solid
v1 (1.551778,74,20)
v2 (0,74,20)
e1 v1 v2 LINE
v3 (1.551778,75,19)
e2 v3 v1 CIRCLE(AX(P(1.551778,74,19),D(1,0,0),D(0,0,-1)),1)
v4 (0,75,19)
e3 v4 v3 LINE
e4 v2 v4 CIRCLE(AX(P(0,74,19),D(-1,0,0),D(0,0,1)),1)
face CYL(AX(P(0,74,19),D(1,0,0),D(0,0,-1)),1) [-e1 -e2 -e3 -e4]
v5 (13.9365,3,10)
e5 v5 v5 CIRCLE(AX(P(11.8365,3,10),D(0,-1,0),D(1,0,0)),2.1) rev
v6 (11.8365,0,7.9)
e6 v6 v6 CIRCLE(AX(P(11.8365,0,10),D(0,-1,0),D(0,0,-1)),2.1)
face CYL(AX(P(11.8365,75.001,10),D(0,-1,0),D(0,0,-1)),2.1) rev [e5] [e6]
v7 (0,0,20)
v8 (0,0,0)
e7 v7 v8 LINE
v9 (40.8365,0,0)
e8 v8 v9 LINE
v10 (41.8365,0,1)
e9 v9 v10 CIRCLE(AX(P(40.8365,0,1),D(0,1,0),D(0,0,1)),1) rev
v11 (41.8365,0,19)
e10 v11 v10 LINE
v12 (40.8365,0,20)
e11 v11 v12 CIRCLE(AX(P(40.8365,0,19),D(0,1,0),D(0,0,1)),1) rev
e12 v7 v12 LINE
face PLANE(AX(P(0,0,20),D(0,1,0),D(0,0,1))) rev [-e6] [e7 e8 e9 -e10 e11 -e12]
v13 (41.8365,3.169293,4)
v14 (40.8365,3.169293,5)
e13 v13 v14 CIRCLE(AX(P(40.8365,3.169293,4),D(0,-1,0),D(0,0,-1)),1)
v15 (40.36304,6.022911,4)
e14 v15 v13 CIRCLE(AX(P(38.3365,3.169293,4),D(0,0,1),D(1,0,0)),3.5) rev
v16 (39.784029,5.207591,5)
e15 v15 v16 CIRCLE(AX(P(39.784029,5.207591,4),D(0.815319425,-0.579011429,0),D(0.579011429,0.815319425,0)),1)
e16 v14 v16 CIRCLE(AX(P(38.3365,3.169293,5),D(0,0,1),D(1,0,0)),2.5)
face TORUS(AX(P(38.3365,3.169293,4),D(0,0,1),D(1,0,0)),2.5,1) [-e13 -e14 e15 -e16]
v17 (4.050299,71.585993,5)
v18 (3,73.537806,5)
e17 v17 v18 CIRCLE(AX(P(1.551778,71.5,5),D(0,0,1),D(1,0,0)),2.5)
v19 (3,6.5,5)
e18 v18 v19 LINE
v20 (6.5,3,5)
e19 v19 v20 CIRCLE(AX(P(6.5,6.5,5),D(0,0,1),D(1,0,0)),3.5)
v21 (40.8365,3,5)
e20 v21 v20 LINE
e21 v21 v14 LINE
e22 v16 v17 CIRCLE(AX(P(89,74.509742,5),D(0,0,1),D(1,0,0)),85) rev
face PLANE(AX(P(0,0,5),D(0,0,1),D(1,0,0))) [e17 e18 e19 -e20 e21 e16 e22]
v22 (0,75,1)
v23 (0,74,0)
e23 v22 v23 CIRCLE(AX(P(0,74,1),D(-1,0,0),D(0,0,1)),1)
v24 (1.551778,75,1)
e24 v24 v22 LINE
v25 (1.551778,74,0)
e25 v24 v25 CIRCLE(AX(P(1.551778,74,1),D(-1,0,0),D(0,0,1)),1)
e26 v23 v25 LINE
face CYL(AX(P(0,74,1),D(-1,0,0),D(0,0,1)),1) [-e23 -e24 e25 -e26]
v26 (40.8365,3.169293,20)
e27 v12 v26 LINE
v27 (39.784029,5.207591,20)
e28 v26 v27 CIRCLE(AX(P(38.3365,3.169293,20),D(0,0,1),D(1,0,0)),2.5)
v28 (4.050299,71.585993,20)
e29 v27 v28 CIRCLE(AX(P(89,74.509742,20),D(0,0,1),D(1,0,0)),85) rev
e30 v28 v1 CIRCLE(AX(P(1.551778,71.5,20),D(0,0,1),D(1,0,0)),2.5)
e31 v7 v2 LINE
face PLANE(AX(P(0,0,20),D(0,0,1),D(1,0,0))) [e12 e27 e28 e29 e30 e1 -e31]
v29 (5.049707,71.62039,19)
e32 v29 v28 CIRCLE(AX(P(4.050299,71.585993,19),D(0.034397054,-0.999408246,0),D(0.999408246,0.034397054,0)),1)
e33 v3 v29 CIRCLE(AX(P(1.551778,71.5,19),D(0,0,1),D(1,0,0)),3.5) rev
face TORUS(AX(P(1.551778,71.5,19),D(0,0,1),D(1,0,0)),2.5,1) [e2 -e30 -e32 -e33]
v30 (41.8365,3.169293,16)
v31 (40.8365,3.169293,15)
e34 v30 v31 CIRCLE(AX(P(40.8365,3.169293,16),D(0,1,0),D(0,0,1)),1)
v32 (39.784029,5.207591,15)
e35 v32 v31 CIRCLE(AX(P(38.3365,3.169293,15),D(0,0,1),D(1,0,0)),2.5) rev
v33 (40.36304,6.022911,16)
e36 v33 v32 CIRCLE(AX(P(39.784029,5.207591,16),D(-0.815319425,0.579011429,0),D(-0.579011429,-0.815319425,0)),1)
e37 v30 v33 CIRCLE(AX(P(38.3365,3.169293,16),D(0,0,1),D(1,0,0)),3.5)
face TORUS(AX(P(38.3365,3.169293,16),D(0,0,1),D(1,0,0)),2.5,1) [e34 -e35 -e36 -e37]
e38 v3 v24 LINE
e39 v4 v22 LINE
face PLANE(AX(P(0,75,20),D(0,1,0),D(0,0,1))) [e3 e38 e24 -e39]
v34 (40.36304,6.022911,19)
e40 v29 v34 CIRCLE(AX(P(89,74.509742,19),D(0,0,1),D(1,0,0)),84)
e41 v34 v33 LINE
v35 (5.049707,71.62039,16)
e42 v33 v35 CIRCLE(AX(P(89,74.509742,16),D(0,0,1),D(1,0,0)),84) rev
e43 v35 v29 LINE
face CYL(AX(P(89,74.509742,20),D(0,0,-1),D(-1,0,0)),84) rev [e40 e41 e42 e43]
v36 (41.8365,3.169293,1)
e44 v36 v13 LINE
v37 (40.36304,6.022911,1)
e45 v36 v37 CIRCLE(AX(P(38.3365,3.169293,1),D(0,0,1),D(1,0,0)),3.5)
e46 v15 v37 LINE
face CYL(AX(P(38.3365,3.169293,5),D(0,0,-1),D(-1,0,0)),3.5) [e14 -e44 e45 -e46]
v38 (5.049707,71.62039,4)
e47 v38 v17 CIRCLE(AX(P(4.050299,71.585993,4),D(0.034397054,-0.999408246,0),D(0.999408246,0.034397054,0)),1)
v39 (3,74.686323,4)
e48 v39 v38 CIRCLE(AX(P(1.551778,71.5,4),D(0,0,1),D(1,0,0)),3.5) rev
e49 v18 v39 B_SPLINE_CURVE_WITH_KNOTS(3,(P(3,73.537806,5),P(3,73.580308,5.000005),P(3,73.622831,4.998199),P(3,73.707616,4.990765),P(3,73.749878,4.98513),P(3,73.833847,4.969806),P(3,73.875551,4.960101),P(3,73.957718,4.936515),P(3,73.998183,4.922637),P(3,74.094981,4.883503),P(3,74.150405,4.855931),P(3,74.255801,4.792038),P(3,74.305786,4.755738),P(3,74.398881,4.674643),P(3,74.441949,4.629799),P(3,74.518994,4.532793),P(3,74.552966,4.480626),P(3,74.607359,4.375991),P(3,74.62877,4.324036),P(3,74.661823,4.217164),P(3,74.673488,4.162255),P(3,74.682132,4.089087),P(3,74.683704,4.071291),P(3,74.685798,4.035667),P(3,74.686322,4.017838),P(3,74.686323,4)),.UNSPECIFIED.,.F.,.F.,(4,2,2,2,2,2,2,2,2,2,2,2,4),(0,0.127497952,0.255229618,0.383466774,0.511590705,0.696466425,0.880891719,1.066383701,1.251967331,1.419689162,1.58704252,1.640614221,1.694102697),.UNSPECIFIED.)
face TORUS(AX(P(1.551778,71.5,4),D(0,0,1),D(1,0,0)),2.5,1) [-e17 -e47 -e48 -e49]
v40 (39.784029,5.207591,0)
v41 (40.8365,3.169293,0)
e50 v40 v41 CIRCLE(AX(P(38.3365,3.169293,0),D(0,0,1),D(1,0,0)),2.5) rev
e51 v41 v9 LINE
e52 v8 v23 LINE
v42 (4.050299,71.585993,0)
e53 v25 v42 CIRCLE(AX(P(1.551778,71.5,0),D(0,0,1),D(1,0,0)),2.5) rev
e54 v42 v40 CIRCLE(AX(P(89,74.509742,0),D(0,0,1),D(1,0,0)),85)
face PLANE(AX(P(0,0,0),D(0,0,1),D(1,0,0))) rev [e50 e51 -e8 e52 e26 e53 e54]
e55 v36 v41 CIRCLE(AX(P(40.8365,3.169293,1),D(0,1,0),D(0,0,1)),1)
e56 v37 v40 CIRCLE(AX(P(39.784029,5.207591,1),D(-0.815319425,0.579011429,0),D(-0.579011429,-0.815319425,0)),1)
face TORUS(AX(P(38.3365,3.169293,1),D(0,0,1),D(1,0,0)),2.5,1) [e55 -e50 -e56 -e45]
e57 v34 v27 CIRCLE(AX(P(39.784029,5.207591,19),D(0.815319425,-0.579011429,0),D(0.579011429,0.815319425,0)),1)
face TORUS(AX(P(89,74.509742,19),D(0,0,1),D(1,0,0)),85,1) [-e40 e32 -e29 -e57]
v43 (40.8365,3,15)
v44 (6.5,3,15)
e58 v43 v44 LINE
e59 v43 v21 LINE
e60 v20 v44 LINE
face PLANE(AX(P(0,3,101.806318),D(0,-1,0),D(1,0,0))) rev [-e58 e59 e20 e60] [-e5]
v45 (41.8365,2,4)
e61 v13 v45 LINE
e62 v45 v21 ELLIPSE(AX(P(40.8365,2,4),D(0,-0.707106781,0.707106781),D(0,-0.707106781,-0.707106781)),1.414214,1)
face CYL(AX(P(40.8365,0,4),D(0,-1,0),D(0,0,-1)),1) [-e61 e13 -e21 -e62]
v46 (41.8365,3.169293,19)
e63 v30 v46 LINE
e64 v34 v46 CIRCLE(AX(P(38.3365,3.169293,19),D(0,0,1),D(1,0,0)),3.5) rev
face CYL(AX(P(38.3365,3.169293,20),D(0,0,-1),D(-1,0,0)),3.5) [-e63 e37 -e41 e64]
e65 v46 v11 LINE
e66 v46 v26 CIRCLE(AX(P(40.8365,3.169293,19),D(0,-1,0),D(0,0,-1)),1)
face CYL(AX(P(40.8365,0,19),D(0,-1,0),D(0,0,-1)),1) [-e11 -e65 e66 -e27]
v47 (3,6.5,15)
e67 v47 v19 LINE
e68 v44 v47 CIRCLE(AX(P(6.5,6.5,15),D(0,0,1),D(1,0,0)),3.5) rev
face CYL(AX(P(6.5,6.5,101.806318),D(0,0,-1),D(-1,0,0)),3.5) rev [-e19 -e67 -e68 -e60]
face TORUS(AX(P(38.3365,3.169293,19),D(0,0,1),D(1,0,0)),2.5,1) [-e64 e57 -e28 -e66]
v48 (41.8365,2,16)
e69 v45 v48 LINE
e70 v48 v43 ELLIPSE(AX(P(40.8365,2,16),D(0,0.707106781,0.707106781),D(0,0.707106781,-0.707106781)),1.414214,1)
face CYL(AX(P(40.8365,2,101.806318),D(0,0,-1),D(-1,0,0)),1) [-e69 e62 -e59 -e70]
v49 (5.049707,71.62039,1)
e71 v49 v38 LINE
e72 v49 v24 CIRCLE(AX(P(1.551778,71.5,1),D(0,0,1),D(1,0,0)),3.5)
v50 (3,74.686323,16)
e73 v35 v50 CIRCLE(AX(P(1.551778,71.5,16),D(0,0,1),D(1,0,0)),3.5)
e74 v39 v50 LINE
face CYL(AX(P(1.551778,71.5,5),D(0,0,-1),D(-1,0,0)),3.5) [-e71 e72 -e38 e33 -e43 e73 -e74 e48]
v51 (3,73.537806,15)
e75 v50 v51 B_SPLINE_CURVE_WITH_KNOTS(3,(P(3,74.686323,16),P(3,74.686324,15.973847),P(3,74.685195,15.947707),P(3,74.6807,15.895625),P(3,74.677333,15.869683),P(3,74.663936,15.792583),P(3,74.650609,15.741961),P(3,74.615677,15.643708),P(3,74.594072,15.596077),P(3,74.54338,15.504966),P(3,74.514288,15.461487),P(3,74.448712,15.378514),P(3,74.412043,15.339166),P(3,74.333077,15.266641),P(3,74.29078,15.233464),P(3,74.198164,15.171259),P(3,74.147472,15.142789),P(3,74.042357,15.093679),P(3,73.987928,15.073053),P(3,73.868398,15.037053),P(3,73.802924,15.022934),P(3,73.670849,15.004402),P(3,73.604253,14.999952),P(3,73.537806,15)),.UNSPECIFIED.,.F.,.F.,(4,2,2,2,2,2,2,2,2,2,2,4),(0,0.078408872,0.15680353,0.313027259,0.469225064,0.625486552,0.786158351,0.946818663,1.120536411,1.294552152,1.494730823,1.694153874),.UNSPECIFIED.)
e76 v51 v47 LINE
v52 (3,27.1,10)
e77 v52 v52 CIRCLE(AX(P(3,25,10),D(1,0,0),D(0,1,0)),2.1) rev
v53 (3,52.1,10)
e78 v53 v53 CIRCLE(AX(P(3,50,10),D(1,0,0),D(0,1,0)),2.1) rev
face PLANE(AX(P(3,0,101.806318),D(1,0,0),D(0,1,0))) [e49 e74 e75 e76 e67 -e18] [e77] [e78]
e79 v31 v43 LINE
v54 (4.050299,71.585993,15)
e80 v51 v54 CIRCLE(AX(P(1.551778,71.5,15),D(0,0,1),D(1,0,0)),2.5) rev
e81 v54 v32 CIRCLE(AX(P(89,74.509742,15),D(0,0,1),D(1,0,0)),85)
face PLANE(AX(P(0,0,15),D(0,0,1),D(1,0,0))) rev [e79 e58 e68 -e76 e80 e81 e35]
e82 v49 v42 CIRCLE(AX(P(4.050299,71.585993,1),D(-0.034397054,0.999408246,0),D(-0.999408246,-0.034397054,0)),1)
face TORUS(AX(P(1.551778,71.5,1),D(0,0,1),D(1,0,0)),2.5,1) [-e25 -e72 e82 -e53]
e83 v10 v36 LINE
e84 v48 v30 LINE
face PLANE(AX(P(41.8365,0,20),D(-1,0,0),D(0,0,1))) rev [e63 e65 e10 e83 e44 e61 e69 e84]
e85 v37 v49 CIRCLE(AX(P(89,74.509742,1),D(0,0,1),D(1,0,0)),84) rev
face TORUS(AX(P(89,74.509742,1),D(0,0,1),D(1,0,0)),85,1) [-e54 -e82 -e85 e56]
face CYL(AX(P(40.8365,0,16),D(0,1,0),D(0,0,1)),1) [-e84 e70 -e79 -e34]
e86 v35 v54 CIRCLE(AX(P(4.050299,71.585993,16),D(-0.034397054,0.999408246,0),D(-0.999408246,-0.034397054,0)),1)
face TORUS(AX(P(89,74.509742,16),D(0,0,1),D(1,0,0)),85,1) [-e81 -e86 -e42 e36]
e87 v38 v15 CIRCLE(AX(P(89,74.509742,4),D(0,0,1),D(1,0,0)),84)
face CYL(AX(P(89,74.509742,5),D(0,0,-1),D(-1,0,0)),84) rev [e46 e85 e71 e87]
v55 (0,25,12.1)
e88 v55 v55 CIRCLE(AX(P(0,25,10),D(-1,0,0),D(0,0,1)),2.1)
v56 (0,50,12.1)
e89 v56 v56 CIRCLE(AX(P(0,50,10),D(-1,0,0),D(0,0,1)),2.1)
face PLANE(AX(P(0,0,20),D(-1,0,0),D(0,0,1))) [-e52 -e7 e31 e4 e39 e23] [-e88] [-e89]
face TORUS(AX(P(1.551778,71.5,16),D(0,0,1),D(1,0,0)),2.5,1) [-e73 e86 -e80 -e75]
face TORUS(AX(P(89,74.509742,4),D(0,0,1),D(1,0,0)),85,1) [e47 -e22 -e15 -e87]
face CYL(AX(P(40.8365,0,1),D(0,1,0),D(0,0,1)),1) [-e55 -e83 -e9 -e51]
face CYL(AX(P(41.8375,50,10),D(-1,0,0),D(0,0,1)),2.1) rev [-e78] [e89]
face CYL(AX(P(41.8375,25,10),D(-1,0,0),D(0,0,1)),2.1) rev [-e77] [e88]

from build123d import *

# Parameters (mm, degrees)
BOSS_EXTRUDE1_DEPTH = 20
CUT_EXTRUDE1_DEPTH  = 15
BOSS_EXTRUDE2_DEPTH = 5
CUT_EXTRUDE2_REACH  = 90.178
SKETCH2_R           = 2.1
CUT_EXTRUDE3_REACH  = 90.178
SKETCH3_R           = 2.1
FILLET2_R           = 84
FILLET3_R           = 3.5
FILLET4_R           = 1


with BuildPart() as part:
    # Sketch1 → Boss-Extrude1 (new body)
    with BuildSketch(Plane.XY):
        Polygon((41.8365, 5), (5, 5), (5, 75), (0, 75), (0, 0), (41.8365, 0), align=None)
    extrude(amount=BOSS_EXTRUDE1_DEPTH)

    # Sketch1<3> → Cut-Extrude1 (cut)
    with BuildSketch(Plane.XY):
        Polygon((41.8365, 5), (5, 5), (5, 75), (3, 75), (3, 3), (41.8365, 3), align=None)
    extrude(amount=CUT_EXTRUDE1_DEPTH, mode=Mode.SUBTRACT)

    # Sketch1<4> → Boss-Extrude2 (add)
    with BuildSketch(Plane.XY):
        Polygon((41.8365, 5), (5, 5), (5, 75), (3, 75), (3, 3), (41.8365, 3), align=None)
    extrude(amount=BOSS_EXTRUDE2_DEPTH)

    # Sketch2 → Cut-Extrude2 (cut, up to next)
    with BuildSketch(Plane.XZ, mode=Mode.PRIVATE) as cut_extrude2_sk1:
        with Locations(Location((11.8365, 10, 0), (0, 0, 270))):
            Circle(SKETCH2_R)
    cut_extrude2_tool1 = extrude(cut_extrude2_sk1.sketch, amount=-CUT_EXTRUDE2_REACH, mode=Mode.PRIVATE) & part.part
    add(cut_extrude2_tool1.solids().sort_by_distance((11.8365, 0, 10))[0], mode=Mode.SUBTRACT)

    # Sketch3 → Cut-Extrude3 (cut, up to next)
    with BuildSketch(Plane.ZY, mode=Mode.PRIVATE) as cut_extrude3_sk1:
        with Locations((10, 25)):
            Circle(SKETCH3_R)
    cut_extrude3_tool1 = extrude(cut_extrude3_sk1.sketch, amount=-CUT_EXTRUDE3_REACH, mode=Mode.PRIVATE) & part.part
    # Sketch3 → Cut-Extrude3 (cut, up to next)
    with BuildSketch(Plane.ZY, mode=Mode.PRIVATE) as cut_extrude3_sk2:
        with Locations((10, 50)):
            Circle(SKETCH3_R)
    cut_extrude3_tool2 = extrude(cut_extrude3_sk2.sketch, amount=-CUT_EXTRUDE3_REACH, mode=Mode.PRIVATE) & part.part
    add(cut_extrude3_tool1.solids().sort_by_distance((0, 25, 10))[0], mode=Mode.SUBTRACT)
    add(cut_extrude3_tool2.solids().sort_by_distance((0, 50, 10))[0], mode=Mode.SUBTRACT)

    # Fillet2
    # the kernel refuses this fillet: 84 mm, written as the material it adds along each edge
    with BuildSketch(Plane(origin=(5, 5, -158.774355627), x_dir=(1, 0, 0), z_dir=(0, 0, 1))) as fillet2_piece_1_section:
        with BuildLine():
            CenterArc((84, 69.509742251), FILLET2_R, 180, 55.842464398)
            Line((0, 69.509742251), (-1.68, 69.509742251))
            Line((-1.68, 69.509742251), (-1.68, 0))
            Line((-1.68, 0), (0, -1.68))
            ThreePointArc((0, -1.68), (18.41825, -1.68), (35.89323, -1.390194845))
            Line((35.89323, -1.390194845), (36.8365, 0))
        make_face()
    fillet2_piece_1 = extrude(amount=178.774355627, mode=Mode.PRIVATE)
    fillet2_piece_1 = split(fillet2_piece_1, bisect_by=Plane(origin=(14.491057498, 22.671022952, 0), z_dir=(0, 0, 1)), keep=Keep.TOP, mode=Mode.PRIVATE)
    fillet2_piece_1 = split(fillet2_piece_1, bisect_by=Plane(origin=(14.491057498, 22.671022952, 5), z_dir=(0, 0, -1)), keep=Keep.TOP, mode=Mode.PRIVATE)
    add(fillet2_piece_1)
    with BuildSketch(Plane(origin=(5, 5, 15), x_dir=(1, 0, 0), z_dir=(0, 0, 1)), Plane(origin=(5, 5, 0), x_dir=(1, 0, 0), z_dir=(0, 0, 1))) as fillet2_piece_2:
        with BuildLine():
            CenterArc((84, 69.509742251), FILLET2_R, 180, 55.842464398)
            Line((0, 69.509742251), (-1.68, 69.509742251))
            Line((-1.68, 69.509742251), (-1.68, 0))
            Line((-1.68, 0), (0, -1.68))
            ThreePointArc((0, -1.68), (18.41825, -1.68), (35.89323, -1.390194845))
            Line((35.89323, -1.390194845), (36.8365, 0))
        make_face()
    extrude(amount=5)
    with BuildSketch(Plane(origin=(5, 5, 0), x_dir=(1, 0, 0), z_dir=(0, 0, 1))) as fillet2_piece_3_section:
        with BuildLine():
            CenterArc((84, 69.509742251), FILLET2_R, 180, 55.842464398)
            Line((0, 69.509742251), (-1.68, 69.509742251))
            Line((-1.68, 69.509742251), (-1.68, 0))
            Line((-1.68, 0), (0, -1.68))
            ThreePointArc((0, -1.68), (18.41825, -1.68), (35.89323, -1.390194845))
            Line((35.89323, -1.390194845), (36.8365, 0))
        make_face()
    fillet2_piece_3 = extrude(amount=178.774355627, mode=Mode.PRIVATE)
    fillet2_piece_3 = split(fillet2_piece_3, bisect_by=Plane(origin=(14.491057498, 22.671022952, 15), z_dir=(0, 0, 1)), keep=Keep.TOP, mode=Mode.PRIVATE)
    fillet2_piece_3 = split(fillet2_piece_3, bisect_by=Plane(origin=(14.491057498, 22.671022952, 20), z_dir=(0, 0, -1)), keep=Keep.TOP, mode=Mode.PRIVATE)
    add(fillet2_piece_3)

    # Fillet3
    # the kernel refuses this fillet: 3.5 mm, written as the material it adds along each edge
    with BuildSketch(Plane(origin=(3, 3, 5), x_dir=(1, 0, 0), z_dir=(0, 0, 1))) as fillet3_piece_1:
        with BuildLine():
            CenterArc((FILLET3_R, FILLET3_R), FILLET3_R, 180, 90)
            Line((0, FILLET3_R), (-FILLET3_R * 0.02, FILLET3_R))
            Line((-FILLET3_R * 0.02, FILLET3_R), (-FILLET3_R * 0.02, -FILLET3_R * 0.02))
            Line((-FILLET3_R * 0.02, -FILLET3_R * 0.02), (FILLET3_R, -FILLET3_R * 0.02))
            Line((FILLET3_R, -FILLET3_R * 0.02), (FILLET3_R, 0))
        make_face()
    extrude(amount=10)
    # the kernel refuses this fillet: 3.5 mm, written as the material it takes off along each edge
    with BuildSketch(Plane(origin=(5, 75, -20.689329277), x_dir=(-1, 0, 0), z_dir=(0, 0, 1))) as fillet3_2_piece_1:
        with BuildLine():
            CenterArc((3.448221546, 3.5), FILLET3_R, 181.971194875, 88.028805125)
            Line((-0.049707316, 3.37961031), (-0.399500202, 3.367571341))
            ThreePointArc((-0.399500202, 3.367571341), (-0.35, 0.490257749), (-0.35, 0))
            Line((-0.35, 0), (0, -0.35))
            Line((0, -0.35), (3.448221546, -0.35))
            Line((3.448221546, -0.35), (3.448221546, 0))
        make_face()
    extrude(amount=46.378658554, mode=Mode.SUBTRACT)
    with BuildSketch(Plane(origin=(41.8365, 5, -10.984244879), x_dir=(0, -1, 0), z_dir=(0, 0, 1))) as fillet3_2_piece_2:
        with BuildLine():
            CenterArc((1.83070748, -3.5), FILLET3_R, 90, 54.618958209)
            Line((-1.022910509, -1.47346), (-1.079982869, -1.4329292))
            ThreePointArc((-1.079982869, -1.4329292), (-0.565023995, -0.699541323), (-0.057924785, 0.039302917))
            Line((-0.057924785, 0.039302917), (0, 0.07))
            Line((0, 0.07), (1.83070748, 0.07))
            Line((1.83070748, 0.07), (1.83070748, 0))
        make_face()
    extrude(amount=26.968489758, mode=Mode.SUBTRACT)
    with BuildSketch(Plane(origin=(41.8365, 5, 4.015755121), x_dir=(-0.8214550012543749, 0.5702733387720094, 0), z_dir=(0, 0, 1))) as fillet3_2_piece_3:
        with BuildLine():
            CenterArc((1.831088838, 3.499800501), FILLET3_R, 214.769288697, 54.618958209)
            Line((-1.044003667, 1.503843815), (-1.101505517, 1.463924681))
            Line((-1.101505517, 1.463924681), (-0.05750185, -0.039919134))
            Line((-0.05750185, -0.039919134), (0.000747383, -0.06999601))
            ThreePointArc((0.000747383, -0.06999601), (0.896859839, -0.065212021), (1.792972294, -0.06999601))
            Line((1.792972294, -0.06999601), (1.793719678, 0))
        make_face()
    extrude(amount=26.968489758, mode=Mode.SUBTRACT)

    # Fillet4
    fillet4_edges = [part.edges().sort_by_distance(p)[0] for p in [
        (0.775889227, 75, 20),
        (41.446394693, 4.775080489, 15),
        (4.461432686, 73.445228071, 15),
        (15.036480531, 34.69268827, 20),
        (41.446394693, 4.775080489, 20),
        (3.983715551, 74.017078059, 20),
        (0.775889227, 75, 0),
        (41.8365, 1.58464626, 20),
        (41.8365, 3.08464626, 15),
        (41.8365, 3, 10),
        (41.8365, 3.08464626, 5),
        (41.8365, 1.58464626, 0),
        (15.036480531, 34.69268827, 0),
        (41.446394693, 4.775080489, 0),
        (3.983715551, 74.017078059, 0),
        (15.036480531, 34.69268827, 5),
        (41.446394693, 4.775080489, 5),
        (4.461432686, 73.445228071, 5),
        (15.036480531, 34.69268827, 15),
    ]]
    fillet(fillet4_edges, radius=FILLET4_R)


solid = part.part
